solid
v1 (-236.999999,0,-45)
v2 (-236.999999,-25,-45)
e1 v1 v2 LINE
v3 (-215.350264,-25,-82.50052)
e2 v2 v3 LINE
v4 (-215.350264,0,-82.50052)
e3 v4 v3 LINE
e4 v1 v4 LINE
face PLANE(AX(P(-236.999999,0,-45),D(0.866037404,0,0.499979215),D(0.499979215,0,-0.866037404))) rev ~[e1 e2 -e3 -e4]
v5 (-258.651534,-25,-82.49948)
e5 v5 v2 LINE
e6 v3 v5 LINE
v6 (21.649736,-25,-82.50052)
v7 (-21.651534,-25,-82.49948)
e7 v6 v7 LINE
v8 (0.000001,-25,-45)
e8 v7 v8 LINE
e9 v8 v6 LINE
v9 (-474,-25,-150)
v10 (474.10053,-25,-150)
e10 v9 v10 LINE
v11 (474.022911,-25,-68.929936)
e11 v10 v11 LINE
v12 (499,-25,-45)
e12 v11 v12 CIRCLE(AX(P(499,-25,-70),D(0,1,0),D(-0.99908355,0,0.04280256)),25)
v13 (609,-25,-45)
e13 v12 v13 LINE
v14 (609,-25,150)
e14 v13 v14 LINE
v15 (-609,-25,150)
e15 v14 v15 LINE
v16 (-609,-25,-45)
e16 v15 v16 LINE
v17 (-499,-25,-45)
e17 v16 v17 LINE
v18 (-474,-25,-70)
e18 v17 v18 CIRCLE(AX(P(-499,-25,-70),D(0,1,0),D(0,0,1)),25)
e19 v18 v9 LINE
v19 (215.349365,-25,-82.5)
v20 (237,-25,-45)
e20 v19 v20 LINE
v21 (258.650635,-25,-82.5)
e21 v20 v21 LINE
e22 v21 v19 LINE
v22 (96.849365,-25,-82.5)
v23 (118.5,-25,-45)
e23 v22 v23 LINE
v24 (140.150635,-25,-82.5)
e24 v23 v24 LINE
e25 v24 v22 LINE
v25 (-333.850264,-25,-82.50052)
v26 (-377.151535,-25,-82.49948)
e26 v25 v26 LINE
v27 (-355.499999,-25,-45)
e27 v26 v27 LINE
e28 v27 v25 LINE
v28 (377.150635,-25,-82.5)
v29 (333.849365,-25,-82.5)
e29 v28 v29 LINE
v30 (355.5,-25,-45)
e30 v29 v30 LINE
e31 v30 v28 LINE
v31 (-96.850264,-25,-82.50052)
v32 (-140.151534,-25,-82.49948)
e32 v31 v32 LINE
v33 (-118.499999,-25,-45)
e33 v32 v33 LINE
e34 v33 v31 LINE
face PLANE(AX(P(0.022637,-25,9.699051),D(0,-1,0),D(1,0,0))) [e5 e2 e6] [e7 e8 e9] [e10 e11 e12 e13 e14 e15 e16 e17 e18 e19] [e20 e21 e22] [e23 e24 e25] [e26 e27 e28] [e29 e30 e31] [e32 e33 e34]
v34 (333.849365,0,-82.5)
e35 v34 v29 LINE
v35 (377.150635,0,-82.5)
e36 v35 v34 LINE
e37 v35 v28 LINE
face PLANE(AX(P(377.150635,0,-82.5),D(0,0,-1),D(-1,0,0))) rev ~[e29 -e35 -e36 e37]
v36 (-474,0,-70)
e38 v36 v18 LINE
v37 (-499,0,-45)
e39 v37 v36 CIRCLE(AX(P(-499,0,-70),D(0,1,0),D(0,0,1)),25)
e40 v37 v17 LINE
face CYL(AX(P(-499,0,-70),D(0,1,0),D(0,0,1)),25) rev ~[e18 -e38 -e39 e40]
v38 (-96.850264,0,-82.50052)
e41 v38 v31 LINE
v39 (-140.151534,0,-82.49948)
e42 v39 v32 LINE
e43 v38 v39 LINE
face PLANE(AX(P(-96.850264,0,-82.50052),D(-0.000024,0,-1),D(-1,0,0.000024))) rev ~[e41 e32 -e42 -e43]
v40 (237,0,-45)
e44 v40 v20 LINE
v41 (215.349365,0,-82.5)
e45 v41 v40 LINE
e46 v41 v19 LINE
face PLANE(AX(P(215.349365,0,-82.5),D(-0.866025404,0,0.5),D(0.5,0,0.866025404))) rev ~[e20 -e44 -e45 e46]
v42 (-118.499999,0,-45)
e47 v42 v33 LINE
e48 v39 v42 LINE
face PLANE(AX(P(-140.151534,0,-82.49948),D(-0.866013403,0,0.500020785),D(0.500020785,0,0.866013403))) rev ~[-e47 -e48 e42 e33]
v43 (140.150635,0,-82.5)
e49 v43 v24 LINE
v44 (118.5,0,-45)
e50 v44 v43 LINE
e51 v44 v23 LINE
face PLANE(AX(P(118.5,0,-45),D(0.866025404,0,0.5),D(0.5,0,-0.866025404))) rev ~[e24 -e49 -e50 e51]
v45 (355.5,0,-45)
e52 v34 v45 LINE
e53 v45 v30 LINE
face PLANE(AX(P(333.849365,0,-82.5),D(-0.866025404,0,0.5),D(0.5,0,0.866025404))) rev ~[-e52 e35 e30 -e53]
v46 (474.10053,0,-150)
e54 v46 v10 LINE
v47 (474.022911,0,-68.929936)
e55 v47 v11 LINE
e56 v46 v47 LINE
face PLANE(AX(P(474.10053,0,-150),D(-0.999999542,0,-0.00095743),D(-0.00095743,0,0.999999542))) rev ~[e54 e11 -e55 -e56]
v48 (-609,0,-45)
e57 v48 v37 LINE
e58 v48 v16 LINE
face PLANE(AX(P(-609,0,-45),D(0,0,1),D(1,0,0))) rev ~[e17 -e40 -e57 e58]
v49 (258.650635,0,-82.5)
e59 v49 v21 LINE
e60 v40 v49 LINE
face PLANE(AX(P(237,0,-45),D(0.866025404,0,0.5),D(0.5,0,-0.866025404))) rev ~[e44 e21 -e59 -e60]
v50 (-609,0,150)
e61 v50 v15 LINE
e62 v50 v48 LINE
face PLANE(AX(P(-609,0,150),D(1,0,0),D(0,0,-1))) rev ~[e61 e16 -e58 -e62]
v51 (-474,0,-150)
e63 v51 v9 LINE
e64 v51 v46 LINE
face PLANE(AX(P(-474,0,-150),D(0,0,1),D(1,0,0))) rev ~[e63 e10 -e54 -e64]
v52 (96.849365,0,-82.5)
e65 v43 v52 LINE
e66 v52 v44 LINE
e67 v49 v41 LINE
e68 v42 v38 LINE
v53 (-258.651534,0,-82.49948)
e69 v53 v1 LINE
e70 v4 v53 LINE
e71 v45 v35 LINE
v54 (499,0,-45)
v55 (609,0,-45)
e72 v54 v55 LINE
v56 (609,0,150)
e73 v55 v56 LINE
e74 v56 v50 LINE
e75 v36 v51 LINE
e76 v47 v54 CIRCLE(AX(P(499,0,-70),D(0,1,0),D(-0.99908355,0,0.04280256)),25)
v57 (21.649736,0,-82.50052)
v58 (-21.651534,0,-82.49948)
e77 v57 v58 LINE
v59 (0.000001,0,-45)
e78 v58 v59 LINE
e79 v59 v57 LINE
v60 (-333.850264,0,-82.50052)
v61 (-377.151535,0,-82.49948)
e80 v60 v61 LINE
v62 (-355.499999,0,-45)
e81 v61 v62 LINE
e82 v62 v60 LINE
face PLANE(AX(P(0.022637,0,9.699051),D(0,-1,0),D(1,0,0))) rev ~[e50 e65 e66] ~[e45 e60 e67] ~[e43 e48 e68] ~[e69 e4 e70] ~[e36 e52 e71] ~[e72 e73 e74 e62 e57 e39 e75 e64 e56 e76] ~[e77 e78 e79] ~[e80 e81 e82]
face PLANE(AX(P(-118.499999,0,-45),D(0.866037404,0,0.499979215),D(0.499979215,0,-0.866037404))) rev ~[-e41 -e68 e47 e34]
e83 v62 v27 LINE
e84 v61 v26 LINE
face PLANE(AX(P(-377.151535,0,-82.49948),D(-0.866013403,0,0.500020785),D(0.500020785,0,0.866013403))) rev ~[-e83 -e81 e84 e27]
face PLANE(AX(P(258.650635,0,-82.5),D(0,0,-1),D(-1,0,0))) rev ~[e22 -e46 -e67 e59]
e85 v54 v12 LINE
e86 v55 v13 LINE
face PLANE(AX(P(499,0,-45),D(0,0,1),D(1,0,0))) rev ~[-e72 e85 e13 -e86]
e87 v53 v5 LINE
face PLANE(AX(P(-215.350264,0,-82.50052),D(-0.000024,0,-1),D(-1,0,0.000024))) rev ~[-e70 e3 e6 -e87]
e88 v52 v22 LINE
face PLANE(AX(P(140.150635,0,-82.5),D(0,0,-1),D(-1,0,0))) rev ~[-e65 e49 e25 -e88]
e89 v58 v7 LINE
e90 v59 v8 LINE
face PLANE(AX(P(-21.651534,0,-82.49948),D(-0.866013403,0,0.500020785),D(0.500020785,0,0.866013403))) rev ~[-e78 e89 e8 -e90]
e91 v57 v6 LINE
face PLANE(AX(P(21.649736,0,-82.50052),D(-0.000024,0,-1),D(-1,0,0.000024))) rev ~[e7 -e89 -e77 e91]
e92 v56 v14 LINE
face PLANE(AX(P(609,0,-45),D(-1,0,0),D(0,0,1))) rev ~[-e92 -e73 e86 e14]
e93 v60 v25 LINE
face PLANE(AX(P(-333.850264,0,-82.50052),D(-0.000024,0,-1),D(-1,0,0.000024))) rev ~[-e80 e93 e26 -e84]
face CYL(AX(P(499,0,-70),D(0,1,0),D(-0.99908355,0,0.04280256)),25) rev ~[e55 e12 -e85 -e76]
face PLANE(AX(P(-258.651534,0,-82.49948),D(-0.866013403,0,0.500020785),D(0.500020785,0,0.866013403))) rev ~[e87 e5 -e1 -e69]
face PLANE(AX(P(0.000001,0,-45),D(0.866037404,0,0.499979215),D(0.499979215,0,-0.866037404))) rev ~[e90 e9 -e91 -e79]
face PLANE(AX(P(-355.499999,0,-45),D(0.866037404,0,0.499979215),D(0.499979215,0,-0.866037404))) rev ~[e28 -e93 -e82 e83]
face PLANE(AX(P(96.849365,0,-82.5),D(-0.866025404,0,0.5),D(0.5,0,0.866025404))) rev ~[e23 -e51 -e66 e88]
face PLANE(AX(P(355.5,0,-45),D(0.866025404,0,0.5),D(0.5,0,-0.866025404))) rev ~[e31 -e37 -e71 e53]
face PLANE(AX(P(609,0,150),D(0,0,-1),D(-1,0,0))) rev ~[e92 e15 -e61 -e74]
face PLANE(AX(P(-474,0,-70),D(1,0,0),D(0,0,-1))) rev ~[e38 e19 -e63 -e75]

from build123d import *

# Parameters (mm, degrees)
F1_DEPTH = 25


# Not quite as in the source:
# - a feature names something its author has since deleted; it is built from what else it names


with BuildPart() as f1:
    # F0 (on Front) → F1 (new body)
    with BuildSketch(Plane.XZ):
        with BuildLine():
            Line((609, -45), (609, 150))
            Line((609, 150), (-609, 150))
            Line((-609, 150), (-609, -45))
            Line((-609, -45), (-499, -45))
            ThreePointArc((-499, -45), (-481.3223304703, -52.3223304703), (-474, -70))
            Line((-474, -70), (-474, -150))
            Line((-474, -150), (474.1005301476, -150))
            Line((474.1005301476, -150), (474.0229112381, -68.9299359934))
            ThreePointArc((474.0229112381, -68.9299359934), (481.7047925737, -51.947969641), (499, -45))
            Line((499, -45), (609, -45))
        make_face()
        Polygon((-377.1515345675, -82.4994803672), (-355.4999994674, -45), (-333.8502643907, -82.5005196112), align=None, mode=Mode.SUBTRACT)
        Polygon((-258.6515341126, -82.4994803672), (-236.9999990125, -45), (-215.3502639358, -82.5005196112), align=None, mode=Mode.SUBTRACT)
        Polygon((-140.1515340625, -82.4994803672), (-118.4999989624, -45), (-96.8502638857, -82.5005196112), align=None, mode=Mode.SUBTRACT)
        Polygon((-21.651534291, -82.4994803674), (8.087e-07, -45), (21.6497358858, -82.500519611), align=None, mode=Mode.SUBTRACT)
        Polygon((96.8493649054, -82.5), (118.5, -45), (140.1506350946, -82.5), align=None, mode=Mode.SUBTRACT)
        Polygon((215.3493649054, -82.5), (237, -45), (258.6506350946, -82.5), align=None, mode=Mode.SUBTRACT)
        Polygon((333.8493649054, -82.5), (355.5, -45), (377.1506350946, -82.5), align=None, mode=Mode.SUBTRACT)
    extrude(amount=F1_DEPTH)


solid = f1.part
